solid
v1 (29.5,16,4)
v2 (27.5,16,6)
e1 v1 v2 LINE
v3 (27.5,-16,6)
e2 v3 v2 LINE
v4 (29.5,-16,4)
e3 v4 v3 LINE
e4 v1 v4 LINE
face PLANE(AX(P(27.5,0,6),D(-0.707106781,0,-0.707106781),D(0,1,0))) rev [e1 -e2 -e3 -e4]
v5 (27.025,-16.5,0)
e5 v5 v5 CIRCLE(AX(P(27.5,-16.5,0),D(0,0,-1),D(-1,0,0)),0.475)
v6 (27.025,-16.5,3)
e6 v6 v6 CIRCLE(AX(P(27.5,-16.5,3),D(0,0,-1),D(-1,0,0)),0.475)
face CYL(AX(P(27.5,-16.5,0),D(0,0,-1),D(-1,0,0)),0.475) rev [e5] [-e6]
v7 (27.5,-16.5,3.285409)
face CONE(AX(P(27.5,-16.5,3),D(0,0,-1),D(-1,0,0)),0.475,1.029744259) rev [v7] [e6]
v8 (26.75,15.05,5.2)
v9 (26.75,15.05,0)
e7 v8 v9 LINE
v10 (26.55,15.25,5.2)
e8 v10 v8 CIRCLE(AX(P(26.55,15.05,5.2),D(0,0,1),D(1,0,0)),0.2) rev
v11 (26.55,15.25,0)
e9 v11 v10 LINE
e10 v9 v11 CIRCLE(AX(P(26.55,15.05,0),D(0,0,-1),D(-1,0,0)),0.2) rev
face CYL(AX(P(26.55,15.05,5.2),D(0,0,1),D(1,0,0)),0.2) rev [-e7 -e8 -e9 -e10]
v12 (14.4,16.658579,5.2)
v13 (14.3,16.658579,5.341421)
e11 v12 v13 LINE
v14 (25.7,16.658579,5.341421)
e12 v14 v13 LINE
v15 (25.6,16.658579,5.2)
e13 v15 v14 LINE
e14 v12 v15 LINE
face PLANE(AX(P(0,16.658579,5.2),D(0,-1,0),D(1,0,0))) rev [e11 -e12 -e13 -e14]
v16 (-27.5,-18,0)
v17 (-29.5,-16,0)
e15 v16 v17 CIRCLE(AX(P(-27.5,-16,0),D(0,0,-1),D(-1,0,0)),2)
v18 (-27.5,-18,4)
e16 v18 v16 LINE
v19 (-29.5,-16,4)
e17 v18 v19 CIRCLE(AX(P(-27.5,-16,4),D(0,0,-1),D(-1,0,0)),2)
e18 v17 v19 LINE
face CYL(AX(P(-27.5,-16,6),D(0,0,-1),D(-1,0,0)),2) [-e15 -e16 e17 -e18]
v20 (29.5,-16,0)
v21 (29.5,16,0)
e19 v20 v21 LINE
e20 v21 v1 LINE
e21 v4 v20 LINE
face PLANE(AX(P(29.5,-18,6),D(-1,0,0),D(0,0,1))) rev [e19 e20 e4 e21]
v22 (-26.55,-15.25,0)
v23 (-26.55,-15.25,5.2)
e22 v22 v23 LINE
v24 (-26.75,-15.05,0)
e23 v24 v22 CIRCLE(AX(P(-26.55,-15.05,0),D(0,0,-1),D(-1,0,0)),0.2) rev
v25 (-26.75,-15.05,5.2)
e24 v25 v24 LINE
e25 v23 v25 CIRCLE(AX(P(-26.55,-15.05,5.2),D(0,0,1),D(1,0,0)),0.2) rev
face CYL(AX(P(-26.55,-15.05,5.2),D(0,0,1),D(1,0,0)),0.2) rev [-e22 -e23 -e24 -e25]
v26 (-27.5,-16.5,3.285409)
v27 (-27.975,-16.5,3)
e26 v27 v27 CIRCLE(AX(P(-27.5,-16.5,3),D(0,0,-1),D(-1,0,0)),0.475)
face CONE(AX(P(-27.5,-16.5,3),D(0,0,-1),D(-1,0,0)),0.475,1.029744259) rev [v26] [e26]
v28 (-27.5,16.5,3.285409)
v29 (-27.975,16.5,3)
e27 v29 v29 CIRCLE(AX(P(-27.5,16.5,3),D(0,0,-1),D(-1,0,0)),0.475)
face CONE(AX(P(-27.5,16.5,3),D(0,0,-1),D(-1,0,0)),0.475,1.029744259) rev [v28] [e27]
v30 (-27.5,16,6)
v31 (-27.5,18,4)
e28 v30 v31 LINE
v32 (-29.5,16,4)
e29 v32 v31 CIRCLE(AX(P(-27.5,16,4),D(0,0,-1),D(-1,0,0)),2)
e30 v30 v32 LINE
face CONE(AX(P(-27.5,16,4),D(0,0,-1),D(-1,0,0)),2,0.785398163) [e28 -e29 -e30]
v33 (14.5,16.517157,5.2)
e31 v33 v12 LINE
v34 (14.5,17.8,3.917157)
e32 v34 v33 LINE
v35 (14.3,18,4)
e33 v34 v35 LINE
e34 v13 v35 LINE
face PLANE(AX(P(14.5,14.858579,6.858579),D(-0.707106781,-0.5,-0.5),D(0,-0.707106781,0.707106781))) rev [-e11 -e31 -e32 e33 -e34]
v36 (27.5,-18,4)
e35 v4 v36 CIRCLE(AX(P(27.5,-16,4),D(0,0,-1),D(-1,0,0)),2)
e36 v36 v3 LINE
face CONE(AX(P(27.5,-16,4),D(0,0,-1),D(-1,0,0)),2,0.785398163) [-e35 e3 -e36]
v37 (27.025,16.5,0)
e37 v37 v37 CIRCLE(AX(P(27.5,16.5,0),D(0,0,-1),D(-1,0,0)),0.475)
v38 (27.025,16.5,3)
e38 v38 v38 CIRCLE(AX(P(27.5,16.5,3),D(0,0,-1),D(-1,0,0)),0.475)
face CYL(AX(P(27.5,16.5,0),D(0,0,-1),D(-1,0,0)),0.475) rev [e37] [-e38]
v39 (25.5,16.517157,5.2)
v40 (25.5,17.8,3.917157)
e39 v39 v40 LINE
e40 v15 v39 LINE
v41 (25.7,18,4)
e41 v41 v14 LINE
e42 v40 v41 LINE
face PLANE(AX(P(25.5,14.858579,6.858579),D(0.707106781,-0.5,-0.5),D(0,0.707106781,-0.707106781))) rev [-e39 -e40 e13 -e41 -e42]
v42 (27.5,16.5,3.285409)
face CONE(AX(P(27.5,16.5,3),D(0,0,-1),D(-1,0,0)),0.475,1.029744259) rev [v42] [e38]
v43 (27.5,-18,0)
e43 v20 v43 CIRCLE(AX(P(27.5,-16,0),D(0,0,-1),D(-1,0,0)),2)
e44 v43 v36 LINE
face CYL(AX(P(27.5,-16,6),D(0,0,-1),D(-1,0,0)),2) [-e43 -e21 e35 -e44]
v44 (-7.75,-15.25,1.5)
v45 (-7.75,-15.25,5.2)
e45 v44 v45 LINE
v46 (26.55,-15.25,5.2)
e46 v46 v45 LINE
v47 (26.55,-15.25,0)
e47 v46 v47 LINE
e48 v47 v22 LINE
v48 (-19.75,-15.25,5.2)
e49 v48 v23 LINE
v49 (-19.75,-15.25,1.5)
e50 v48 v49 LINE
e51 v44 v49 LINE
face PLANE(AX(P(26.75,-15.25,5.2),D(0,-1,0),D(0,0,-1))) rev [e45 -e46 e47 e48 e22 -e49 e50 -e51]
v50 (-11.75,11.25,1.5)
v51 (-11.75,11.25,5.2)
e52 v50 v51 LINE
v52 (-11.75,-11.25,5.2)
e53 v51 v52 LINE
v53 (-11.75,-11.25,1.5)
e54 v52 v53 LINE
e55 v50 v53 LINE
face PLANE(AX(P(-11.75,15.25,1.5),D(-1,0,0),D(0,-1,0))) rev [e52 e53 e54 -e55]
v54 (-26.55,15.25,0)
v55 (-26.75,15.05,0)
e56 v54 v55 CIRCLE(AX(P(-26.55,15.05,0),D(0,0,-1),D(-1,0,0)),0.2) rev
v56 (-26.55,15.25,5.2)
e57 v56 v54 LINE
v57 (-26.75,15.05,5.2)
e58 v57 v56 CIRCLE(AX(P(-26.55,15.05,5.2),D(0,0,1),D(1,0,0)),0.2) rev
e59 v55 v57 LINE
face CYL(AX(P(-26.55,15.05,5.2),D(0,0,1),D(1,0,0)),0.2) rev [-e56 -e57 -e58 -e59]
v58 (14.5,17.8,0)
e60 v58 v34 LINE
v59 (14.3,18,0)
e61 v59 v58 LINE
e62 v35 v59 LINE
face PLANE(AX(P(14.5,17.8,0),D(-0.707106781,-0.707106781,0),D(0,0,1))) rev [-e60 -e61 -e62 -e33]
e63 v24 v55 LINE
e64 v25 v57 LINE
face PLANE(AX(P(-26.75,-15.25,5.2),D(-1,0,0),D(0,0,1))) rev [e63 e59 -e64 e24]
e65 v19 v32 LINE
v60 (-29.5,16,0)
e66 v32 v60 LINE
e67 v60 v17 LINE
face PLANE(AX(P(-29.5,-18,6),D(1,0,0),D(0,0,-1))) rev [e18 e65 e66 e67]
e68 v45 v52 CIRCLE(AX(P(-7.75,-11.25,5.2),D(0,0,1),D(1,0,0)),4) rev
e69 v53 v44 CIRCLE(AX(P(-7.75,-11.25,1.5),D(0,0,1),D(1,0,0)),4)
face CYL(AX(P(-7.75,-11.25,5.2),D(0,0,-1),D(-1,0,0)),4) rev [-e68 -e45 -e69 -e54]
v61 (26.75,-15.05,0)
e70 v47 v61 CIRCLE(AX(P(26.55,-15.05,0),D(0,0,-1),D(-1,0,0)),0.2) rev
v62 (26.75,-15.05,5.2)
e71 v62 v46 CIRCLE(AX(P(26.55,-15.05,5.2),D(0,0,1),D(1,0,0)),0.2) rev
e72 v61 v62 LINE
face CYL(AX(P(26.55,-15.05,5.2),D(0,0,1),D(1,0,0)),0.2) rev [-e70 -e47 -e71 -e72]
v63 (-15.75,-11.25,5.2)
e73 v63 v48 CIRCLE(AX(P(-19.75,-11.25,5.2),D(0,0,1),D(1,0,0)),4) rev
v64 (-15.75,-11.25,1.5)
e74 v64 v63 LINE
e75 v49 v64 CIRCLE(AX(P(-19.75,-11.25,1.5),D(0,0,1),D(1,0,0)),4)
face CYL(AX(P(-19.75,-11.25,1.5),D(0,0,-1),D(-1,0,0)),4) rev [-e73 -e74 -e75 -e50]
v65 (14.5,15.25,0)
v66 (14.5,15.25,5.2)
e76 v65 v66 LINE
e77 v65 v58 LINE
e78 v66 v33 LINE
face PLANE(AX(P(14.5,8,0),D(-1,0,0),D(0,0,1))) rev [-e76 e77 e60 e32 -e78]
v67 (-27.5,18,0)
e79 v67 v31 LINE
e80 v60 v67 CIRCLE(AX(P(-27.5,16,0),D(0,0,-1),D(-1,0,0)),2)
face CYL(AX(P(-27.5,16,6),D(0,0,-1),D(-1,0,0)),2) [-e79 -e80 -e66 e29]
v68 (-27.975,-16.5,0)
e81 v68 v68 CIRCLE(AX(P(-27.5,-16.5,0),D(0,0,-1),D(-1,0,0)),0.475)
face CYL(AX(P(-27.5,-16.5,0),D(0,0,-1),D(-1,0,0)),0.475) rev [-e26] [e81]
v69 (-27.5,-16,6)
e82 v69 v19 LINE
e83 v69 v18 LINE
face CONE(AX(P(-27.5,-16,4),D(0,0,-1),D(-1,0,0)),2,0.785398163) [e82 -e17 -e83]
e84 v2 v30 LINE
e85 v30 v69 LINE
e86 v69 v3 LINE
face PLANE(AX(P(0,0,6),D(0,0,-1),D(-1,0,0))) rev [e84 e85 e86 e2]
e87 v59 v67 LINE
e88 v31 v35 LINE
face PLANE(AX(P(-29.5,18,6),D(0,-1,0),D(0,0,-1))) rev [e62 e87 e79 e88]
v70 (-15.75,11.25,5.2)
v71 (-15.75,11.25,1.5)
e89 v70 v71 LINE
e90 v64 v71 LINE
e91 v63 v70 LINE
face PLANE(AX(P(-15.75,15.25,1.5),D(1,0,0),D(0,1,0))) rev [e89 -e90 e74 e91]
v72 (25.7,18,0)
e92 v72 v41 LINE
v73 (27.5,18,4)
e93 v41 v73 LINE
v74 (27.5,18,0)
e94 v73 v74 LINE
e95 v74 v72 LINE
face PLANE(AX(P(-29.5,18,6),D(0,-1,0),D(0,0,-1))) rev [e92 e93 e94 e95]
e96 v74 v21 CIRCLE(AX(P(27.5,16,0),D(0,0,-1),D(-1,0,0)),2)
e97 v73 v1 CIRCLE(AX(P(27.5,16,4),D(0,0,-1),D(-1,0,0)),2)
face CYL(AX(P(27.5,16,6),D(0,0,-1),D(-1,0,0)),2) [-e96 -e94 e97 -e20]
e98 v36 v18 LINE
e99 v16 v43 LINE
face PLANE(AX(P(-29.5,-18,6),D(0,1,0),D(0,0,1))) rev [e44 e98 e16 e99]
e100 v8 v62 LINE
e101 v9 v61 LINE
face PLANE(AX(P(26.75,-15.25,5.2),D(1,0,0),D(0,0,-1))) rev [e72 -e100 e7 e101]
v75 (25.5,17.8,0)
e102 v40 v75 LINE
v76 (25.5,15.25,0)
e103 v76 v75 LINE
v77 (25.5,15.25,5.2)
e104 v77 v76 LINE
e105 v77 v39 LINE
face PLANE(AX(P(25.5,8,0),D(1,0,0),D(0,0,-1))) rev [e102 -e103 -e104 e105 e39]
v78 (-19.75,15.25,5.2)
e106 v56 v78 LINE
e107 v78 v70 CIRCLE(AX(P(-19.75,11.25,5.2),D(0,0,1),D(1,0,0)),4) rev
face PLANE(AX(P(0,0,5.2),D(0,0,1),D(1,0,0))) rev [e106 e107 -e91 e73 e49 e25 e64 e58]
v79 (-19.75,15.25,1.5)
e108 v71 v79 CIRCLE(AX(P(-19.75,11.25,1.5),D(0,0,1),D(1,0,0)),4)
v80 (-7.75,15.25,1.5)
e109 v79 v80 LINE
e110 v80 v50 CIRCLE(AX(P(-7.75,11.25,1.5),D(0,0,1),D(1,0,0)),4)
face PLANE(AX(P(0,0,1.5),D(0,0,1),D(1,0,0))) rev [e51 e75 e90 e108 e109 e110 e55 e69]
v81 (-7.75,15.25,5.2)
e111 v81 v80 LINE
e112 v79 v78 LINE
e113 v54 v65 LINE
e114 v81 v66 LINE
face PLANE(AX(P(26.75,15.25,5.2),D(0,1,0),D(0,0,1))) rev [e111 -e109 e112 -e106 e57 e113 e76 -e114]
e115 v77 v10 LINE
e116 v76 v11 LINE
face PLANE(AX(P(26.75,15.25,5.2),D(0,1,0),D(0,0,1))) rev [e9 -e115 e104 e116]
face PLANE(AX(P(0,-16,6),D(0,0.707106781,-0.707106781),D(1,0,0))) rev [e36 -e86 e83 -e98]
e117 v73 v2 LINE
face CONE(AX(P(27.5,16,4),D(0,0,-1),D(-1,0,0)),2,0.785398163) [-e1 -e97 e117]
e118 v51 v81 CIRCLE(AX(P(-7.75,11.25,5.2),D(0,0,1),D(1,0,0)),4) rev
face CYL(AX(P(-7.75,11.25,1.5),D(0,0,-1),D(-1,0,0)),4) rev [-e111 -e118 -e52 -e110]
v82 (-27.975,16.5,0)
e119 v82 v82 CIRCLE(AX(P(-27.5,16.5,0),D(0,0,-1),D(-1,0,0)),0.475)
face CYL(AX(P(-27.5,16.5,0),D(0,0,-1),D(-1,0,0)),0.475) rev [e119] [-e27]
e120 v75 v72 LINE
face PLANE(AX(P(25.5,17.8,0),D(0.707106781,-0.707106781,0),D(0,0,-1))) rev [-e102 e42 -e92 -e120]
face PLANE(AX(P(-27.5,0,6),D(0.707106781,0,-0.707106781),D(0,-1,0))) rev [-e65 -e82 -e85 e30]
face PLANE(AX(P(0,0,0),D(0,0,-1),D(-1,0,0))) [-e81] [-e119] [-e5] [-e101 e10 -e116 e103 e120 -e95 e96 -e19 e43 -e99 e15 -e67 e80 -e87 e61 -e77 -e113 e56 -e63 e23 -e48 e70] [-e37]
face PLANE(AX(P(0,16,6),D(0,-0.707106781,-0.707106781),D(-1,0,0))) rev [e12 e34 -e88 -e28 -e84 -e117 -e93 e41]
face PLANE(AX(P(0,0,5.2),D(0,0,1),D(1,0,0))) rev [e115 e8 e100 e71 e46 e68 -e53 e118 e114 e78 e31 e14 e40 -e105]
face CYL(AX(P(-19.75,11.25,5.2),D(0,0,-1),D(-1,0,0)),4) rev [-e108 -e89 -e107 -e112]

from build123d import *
from OCP.BRepFilletAPI import BRepFilletAPI_MakeChamfer

# Parameters (mm, degrees)
SKETCH_1_W          = 59
SKETCH_1_H          = 36
EXTRUDE_1_DEPTH     = 6
SKETCH_2_W          = 53.5
SKETCH_2_H          = 30.5
CUT_EXTRUDE_1_DEPTH = 5.2
FILLET_1_R          = 2
SKETCH_3_W          = 4
SKETCH_3_H          = 30.5
EXTRUDE_2_DEPTH     = 3.7
FILLET_2_R          = 4
CHAMFER_1_SIZE      = 2
SKETCH_4_W          = 11
SKETCH_4_H          = 5.2
CUT_EXTRUDE_2_DEPTH = 10
FILLET_3_R          = 0.2
CHAMFER_2_SIZE      = 0.2
CHAMFER_2_SIZE_2    = 0.141421356
M1_2X0_25_1_D       = 0.95
M1_2X0_25_1_DEPTH   = 3
M1_2X0_25_1_TIP     = 0.285408794


with BuildPart() as part:
    # 草图1 → 凸台-拉伸1 (new body)
    with BuildSketch(Plane.XY):
        Rectangle(SKETCH_1_W, SKETCH_1_H)
    extrude(amount=EXTRUDE_1_DEPTH)

    # 草图2 → 切除-拉伸1 (cut)
    with BuildSketch(Plane(origin=(0, 0, 0), x_dir=(-1, 0, 0), z_dir=(0, 0, -1))):
        Rectangle(SKETCH_2_W, SKETCH_2_H)
    extrude(amount=-CUT_EXTRUDE_1_DEPTH, mode=Mode.SUBTRACT)

    # 圆角1
    fillet_1_edges = [part.edges().sort_by_distance(p)[0] for p in [
        (29.5, -18, 3),
        (-29.5, -18, 3),
        (-29.5, 18, 3),
        (29.5, 18, 3),
    ]]
    fillet(fillet_1_edges, radius=FILLET_1_R)

    # 草图3 → 凸台-拉伸2 (add)
    with BuildSketch(Plane(origin=(0, 0, 5.2), x_dir=(-1, 0, 0), z_dir=(0, 0, -1))):
        with Locations((13.75, 0)):
            Rectangle(SKETCH_3_W, SKETCH_3_H)
    extrude(amount=EXTRUDE_2_DEPTH)

    # 圆角2
    fillet_2_edges = [part.edges().sort_by_distance(p)[0] for p in [
        (-15.75, -15.25, 3.35),
        (-15.75, 15.25, 3.35),
        (-11.75, 15.25, 3.35),
        (-11.75, -15.25, 3.35),
    ]]
    fillet(fillet_2_edges, radius=FILLET_2_R)

    # 倒角1
    chamfer_1_edges = [part.edges().sort_by_distance(p)[0] for p in [
        (-29.5, 0, 6),
        (0, 18, 6),
        (29.5, 0, 6),
        (0, -18, 6),
        (28.914213562, -17.414213562, 6),
        (28.914213562, 17.414213562, 6),
        (-28.914213562, -17.414213562, 6),
        (-28.914213562, 17.414213562, 6),
    ]]
    chamfer(chamfer_1_edges, length=CHAMFER_1_SIZE)

    # 草图4 → 切除-拉伸2 (cut)
    with BuildSketch(Plane(origin=(0, 18, 0), x_dir=(1, 0, 0), z_dir=(0, 1, 0))):
        with Locations((20, -2.6)):
            Rectangle(SKETCH_4_W, SKETCH_4_H)
    extrude(amount=-CUT_EXTRUDE_2_DEPTH, mode=Mode.SUBTRACT)

    # 圆角3
    fillet_3_edges = [part.edges().sort_by_distance(p)[0] for p in [
        (-26.75, 15.25, 2.6),
        (-26.75, -15.25, 2.6),
        (26.75, -15.25, 2.6),
        (26.75, 15.25, 2.6),
    ]]
    fillet(fillet_3_edges, radius=FILLET_3_R)

    # 倒角2
    chamfer_2_edges_1 = [part.edges().sort_by_distance(p)[0] for p in [
        (14.5, 17.4, 4.6),
        (25.5, 17.4, 4.6),
        (25.5, 18, 2),
        (14.5, 18, 2),
    ]]
    chamfer_2_edges_2 = [part.edges().sort_by_distance(p)[0] for p in [
        (20, 16.8, 5.2),
    ]]
    chamfer_2_side_2 = [part.faces().sort_by_distance(p)[0] for p in [
        (20, 16.797171573, 5.2),
    ]]
    chamfer_2 = BRepFilletAPI_MakeChamfer(part.part.solid().wrapped)
    for e in chamfer_2_edges_1:
        chamfer_2.Add(CHAMFER_2_SIZE - 0.0001, e.wrapped)
    for e in chamfer_2_edges_2:
        chamfer_2.Add(CHAMFER_2_SIZE_2 - 0.0001, CHAMFER_2_SIZE - 0.0001, e.wrapped, chamfer_2_side_2[0].wrapped)
    add(Compound.cast(chamfer_2.Shape()), mode=Mode.REPLACE)  # a hair under: the kernel refuses the full size

    # M1.2x0.25 螺纹孔1
    with Locations(Plane(origin=(27.5, 16.5, 0), x_dir=(-1, 0, 0), z_dir=(0, 0, -1))):
        with Locations((0, 0), (0, -33), (55, -33), (55, 0)):
            Hole(M1_2X0_25_1_D / 2, depth=M1_2X0_25_1_DEPTH)
            with Locations((0, 0, -(M1_2X0_25_1_DEPTH + M1_2X0_25_1_TIP / 2))):  # 118° drill point
                Cone(0, M1_2X0_25_1_D / 2, M1_2X0_25_1_TIP, mode=Mode.SUBTRACT)


solid = part.part
